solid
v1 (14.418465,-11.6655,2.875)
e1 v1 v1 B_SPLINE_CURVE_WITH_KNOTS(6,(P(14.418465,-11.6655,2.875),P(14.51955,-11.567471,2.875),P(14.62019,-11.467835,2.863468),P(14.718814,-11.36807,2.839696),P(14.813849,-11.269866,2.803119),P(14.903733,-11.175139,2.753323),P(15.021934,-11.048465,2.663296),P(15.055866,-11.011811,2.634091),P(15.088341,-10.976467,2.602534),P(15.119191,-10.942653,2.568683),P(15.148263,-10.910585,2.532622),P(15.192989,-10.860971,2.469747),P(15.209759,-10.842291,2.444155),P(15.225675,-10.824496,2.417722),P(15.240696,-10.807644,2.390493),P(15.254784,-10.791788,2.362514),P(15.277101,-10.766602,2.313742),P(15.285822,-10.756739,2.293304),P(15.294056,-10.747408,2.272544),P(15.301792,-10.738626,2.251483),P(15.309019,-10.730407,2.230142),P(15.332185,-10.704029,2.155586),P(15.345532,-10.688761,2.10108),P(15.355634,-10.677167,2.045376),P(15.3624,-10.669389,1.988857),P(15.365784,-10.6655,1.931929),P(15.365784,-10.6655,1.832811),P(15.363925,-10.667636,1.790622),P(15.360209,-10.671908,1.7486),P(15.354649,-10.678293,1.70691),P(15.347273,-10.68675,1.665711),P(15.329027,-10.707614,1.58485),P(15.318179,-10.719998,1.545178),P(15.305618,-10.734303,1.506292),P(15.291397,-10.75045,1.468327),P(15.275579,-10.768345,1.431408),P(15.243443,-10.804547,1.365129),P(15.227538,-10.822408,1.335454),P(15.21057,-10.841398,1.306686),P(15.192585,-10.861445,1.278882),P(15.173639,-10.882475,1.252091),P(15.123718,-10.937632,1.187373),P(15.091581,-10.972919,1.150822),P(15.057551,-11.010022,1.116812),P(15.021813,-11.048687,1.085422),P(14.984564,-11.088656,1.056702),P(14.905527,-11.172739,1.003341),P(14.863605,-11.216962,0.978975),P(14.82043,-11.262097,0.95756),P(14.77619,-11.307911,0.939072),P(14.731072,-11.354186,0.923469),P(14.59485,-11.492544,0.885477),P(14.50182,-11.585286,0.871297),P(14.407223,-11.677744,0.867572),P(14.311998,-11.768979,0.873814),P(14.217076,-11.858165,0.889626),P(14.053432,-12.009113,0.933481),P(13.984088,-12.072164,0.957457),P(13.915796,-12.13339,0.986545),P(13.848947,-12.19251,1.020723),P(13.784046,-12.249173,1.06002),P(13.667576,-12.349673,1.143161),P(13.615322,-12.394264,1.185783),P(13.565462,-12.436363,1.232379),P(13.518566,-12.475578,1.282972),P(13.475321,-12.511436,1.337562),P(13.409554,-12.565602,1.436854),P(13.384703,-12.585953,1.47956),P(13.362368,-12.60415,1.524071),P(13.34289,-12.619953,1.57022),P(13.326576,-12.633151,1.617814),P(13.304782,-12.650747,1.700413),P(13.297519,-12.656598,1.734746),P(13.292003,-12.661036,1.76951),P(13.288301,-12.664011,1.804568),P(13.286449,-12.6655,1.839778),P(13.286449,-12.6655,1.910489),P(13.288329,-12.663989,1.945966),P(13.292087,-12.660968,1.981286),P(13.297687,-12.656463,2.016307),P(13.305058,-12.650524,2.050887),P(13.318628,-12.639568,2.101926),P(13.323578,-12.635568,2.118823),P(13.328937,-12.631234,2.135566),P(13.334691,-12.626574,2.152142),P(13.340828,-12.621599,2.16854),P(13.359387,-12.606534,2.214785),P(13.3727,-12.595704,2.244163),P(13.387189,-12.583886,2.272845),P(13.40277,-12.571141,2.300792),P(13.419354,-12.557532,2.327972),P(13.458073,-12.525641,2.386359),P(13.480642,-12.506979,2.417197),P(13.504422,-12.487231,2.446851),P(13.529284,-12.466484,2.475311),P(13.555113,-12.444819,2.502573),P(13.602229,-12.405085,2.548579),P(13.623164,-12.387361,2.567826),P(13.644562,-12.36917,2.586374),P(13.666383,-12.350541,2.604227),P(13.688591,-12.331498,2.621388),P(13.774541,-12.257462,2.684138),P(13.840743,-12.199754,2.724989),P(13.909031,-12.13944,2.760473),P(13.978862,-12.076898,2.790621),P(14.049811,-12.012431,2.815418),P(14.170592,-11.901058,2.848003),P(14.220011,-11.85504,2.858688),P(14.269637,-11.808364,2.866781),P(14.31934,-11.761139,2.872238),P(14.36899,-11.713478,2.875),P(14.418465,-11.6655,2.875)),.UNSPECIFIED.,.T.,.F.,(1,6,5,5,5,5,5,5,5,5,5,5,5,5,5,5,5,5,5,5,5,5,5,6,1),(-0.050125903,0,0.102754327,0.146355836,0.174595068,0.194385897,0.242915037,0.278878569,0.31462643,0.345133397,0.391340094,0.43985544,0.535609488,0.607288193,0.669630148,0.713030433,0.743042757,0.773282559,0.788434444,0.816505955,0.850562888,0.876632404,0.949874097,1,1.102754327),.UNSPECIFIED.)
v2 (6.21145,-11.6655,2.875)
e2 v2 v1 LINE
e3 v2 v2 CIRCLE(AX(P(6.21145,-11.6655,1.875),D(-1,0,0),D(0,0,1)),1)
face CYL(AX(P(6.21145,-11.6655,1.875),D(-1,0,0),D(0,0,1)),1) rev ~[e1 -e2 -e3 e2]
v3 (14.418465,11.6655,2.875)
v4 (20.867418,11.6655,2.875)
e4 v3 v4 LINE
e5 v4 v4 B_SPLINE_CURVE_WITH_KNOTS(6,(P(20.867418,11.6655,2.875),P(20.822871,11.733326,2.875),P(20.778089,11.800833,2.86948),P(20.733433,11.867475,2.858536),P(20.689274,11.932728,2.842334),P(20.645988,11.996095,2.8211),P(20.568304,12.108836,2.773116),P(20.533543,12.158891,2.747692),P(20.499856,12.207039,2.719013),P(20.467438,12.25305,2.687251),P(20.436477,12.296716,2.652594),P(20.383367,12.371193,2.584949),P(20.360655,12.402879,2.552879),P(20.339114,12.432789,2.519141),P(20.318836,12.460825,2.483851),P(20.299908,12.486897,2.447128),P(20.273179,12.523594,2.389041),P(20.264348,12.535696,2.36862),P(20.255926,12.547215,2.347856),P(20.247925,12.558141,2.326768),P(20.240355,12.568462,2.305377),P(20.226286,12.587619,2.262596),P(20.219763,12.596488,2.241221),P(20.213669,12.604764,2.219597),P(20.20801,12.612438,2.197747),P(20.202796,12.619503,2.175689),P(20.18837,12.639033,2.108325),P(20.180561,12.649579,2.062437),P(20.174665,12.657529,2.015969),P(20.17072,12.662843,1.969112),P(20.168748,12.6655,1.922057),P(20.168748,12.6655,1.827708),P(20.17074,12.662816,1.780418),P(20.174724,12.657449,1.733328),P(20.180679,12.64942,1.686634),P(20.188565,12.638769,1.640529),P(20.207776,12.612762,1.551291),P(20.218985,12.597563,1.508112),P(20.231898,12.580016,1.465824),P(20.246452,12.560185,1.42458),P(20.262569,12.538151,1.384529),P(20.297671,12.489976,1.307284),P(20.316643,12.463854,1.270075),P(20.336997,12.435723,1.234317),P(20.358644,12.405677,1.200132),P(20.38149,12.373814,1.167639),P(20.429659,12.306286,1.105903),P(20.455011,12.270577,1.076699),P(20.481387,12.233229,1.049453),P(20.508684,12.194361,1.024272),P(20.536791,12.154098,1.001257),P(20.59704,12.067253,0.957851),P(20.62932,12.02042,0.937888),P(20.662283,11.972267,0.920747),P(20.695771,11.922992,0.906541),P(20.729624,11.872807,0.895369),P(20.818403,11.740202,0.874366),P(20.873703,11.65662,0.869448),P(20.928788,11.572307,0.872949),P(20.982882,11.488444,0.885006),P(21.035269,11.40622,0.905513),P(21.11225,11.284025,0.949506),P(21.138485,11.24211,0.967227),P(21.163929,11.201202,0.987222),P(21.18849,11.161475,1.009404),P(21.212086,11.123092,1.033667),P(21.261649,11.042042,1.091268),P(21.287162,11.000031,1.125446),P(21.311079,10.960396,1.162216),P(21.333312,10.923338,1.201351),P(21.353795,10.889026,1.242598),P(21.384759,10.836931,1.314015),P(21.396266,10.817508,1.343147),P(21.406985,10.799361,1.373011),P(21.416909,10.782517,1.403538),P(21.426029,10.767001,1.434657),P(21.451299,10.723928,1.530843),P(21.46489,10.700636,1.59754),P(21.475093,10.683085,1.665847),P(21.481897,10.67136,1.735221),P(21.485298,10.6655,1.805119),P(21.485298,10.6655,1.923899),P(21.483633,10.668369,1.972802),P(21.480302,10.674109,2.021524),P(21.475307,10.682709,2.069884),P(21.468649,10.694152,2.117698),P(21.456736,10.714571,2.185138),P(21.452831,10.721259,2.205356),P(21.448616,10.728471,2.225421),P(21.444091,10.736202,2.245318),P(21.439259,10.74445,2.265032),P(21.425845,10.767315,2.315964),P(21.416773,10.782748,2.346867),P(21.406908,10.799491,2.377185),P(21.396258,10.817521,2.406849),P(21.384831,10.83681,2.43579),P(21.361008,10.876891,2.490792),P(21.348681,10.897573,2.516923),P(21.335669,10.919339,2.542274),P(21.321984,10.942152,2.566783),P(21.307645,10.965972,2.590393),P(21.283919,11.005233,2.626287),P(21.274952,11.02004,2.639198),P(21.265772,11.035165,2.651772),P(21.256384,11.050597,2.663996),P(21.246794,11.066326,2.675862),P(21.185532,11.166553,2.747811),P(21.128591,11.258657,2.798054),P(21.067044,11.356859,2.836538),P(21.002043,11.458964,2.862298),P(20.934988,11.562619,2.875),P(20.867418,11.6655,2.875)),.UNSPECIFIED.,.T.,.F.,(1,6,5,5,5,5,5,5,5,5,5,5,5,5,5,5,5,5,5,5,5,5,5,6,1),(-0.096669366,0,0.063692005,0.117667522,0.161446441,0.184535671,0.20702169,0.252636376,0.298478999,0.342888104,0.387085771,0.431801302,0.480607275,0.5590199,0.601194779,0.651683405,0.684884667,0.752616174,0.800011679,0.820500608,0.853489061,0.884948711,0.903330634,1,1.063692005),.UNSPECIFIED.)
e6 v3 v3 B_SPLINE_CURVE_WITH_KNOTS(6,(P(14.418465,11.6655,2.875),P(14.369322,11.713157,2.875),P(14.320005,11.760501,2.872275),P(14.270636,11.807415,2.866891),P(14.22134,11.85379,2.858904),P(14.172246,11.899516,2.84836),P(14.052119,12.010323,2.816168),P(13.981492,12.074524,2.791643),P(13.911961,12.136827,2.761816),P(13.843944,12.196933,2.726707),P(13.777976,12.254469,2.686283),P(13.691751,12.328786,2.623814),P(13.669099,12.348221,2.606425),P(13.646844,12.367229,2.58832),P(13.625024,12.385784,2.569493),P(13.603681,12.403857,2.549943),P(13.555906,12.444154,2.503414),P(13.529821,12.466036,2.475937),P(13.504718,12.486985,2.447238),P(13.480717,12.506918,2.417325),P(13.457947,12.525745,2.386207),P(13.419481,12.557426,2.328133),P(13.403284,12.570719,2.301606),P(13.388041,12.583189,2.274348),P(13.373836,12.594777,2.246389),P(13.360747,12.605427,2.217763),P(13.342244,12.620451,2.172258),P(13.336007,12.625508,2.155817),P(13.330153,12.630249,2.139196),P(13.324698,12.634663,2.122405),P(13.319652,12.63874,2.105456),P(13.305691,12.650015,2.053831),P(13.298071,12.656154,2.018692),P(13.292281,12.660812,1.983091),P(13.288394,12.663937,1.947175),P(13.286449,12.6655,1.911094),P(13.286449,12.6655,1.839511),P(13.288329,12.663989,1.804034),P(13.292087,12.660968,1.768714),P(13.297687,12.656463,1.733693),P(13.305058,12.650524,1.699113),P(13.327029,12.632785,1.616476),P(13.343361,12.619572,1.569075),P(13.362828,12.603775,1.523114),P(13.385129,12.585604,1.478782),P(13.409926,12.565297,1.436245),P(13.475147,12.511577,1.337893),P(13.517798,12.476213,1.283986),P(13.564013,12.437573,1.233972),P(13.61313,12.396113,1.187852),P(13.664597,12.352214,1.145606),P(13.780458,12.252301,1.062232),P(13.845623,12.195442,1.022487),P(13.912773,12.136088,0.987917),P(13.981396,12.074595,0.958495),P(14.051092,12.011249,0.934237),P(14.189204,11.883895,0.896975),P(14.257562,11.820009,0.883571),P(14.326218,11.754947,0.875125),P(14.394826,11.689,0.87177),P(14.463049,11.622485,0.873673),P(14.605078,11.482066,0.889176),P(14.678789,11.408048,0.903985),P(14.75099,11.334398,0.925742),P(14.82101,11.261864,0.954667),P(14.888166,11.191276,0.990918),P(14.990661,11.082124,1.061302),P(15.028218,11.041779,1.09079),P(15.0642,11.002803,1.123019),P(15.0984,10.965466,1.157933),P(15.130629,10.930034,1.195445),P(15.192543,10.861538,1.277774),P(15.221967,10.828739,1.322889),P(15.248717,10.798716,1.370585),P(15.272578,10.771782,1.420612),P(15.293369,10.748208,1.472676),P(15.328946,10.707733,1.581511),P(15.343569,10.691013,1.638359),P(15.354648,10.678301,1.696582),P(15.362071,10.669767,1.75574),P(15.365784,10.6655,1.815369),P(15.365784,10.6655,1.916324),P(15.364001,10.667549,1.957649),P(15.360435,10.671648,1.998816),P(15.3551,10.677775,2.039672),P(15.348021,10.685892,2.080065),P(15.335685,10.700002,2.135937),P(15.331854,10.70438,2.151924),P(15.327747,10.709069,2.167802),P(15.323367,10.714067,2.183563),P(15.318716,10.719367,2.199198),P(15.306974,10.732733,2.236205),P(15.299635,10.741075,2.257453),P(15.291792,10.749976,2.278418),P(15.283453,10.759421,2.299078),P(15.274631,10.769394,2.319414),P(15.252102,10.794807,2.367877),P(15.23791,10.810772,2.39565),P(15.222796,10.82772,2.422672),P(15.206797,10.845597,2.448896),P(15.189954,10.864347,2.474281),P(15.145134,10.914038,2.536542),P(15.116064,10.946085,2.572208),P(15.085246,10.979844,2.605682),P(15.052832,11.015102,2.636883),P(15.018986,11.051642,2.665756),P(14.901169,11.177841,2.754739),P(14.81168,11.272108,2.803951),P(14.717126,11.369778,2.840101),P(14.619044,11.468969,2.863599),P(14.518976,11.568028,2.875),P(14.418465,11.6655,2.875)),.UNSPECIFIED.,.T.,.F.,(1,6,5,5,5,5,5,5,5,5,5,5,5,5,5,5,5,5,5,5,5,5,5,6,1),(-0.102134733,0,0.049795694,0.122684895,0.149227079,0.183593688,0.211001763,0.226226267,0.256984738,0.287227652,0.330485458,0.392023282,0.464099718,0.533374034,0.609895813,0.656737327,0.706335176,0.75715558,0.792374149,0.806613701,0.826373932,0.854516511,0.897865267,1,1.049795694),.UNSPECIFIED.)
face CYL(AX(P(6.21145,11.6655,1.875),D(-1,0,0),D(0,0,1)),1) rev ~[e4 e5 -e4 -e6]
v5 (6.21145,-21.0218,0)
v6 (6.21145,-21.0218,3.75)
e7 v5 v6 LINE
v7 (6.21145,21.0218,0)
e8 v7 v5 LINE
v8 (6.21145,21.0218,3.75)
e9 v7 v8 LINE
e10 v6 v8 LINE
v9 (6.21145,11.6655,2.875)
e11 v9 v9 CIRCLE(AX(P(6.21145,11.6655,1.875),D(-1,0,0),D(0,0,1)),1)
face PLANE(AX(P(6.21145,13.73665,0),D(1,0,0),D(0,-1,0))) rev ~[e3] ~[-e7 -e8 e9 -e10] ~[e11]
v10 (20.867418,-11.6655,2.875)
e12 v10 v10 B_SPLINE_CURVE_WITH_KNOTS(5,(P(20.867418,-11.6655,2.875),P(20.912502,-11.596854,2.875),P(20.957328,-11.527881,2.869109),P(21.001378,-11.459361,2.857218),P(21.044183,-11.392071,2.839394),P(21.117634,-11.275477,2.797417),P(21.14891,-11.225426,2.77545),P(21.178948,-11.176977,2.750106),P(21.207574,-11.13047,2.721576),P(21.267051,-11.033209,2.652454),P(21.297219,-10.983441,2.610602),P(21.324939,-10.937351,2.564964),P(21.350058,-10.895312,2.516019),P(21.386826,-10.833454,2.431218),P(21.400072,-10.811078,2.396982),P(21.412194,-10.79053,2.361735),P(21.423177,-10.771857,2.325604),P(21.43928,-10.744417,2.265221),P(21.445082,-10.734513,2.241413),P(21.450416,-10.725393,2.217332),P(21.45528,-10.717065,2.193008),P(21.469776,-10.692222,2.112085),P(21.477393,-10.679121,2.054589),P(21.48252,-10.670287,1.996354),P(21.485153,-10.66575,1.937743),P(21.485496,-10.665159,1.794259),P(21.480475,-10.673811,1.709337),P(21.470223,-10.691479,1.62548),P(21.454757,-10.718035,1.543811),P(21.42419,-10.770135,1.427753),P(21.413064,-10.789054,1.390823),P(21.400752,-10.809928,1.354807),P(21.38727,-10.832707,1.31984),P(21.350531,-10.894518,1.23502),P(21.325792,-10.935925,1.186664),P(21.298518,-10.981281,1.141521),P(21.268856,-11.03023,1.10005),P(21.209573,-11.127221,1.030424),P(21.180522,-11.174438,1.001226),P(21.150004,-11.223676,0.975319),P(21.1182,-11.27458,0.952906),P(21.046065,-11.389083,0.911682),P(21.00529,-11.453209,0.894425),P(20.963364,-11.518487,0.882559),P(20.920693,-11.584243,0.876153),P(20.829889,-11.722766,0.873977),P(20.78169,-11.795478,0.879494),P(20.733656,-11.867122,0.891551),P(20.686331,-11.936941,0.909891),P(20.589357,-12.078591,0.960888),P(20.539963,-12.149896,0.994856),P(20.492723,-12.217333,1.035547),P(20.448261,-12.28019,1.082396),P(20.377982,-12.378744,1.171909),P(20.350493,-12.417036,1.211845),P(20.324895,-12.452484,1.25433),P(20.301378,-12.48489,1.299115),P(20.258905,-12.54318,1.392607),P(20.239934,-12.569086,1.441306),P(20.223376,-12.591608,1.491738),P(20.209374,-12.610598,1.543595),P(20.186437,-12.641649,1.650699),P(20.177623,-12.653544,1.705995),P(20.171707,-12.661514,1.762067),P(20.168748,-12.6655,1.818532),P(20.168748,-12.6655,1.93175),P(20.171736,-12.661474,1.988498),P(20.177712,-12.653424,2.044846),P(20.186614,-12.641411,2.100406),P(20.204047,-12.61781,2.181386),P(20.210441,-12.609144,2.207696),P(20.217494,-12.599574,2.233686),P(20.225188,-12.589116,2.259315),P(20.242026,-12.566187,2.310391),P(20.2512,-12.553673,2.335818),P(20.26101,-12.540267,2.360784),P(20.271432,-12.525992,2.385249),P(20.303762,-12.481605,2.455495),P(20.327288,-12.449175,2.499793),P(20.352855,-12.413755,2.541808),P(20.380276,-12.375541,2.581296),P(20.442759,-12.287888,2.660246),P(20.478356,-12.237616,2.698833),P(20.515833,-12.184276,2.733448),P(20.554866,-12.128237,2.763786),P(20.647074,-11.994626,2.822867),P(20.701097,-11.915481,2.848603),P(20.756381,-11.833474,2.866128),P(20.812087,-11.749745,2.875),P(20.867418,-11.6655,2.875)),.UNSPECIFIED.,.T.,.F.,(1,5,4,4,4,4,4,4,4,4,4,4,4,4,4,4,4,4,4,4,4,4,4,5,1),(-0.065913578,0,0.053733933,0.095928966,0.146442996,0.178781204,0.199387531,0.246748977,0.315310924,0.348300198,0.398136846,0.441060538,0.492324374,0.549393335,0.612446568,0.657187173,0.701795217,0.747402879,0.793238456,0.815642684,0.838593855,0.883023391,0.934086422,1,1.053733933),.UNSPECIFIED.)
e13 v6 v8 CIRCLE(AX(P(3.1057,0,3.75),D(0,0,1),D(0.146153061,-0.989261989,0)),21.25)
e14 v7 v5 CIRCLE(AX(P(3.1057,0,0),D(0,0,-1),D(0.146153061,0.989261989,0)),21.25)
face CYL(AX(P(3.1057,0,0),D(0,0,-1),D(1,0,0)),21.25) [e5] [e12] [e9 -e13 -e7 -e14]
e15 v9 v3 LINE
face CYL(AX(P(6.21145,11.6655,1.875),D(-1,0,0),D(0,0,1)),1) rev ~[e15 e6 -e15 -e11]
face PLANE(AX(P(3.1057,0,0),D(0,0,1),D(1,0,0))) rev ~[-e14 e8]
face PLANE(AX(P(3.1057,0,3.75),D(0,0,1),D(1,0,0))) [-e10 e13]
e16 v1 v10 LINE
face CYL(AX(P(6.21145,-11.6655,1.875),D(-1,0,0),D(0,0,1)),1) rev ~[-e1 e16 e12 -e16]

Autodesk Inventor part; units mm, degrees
ref_plane "YZ Plane" through (0, 0, 0) normal (1, 0, 0) x (0, 1, 0)
ref_plane "XZ Plane" through (0, 0, 0) normal (0, 1, 0) x (-1, 0, 0)
ref_plane "XY Plane" through (0, 0, 0) normal (0, 0, 1) x (1, 0, 0)
sketch "Sketch3" plane through (0, 0, 0) normal (0, 0, 1) x (1, 0, 0)
  arc A0 (6.2115, -31.9009) -> (6.2115, 31.9009) centre (0, 0) ccw
  line L0 (6.2115, 27.4733) -> (6.2115, 31.9009)
  line L1 (6.2115, 31.9009) -> (6.2115, -31.9009)
  circle A1 centre (0, 0) radius 42.5
  line L2 (6.2115, -31.9009) -> (6.2115, -42.0436)
  line L3 (6.2115, 31.9009) -> (6.2115, 42.0436)
  point P0 (-5.2115, 24.6247)
  dimension "d14" = 85
extrude "Extrusion2" add sketch "Sketch3" along normal blind 7.5 contours L1 L0 A0
sketch "Sketch4" plane through (6.2115, -31.9009, 0) normal (-1, 0, 0) x (0, 0, 1)
  line L0 (0, 0) -> (0, 6.9167)
  line L1 (7.5, 26.7893) -> (7.5, 0)
  line L2 (7.5, 6.9167) -> (7.5, 0)
  line L3 (7.5, 0) -> (0, 0)
  line L4 (7.5, 0) -> (0, 0)
  circle A0 centre (3.75, 8.5699) radius 1
  line L5 (0, 0) -> (3.0149, 2.7804)
  line L6 (4.4851, 4.1363) -> (7.5, 6.9167)
  line L7 (0, 6.9167) -> (3.0149, 4.1363)
  line L8 (4.4851, 2.7804) -> (7.5, 0)
  line L9 (0, 0) -> (0, 53.5786)
  line L10 (0, 53.5786) -> (0, 0)
  line L11 (0, 31.9009) -> (7.5, 31.9009)
  circle A1 centre (3.75, 55.2319) radius 1
  line L12 (7.5, 53.5786) -> (7.5, 0)
  line L13 (0, 0) -> (0, 63.8018) projected
  line L14 (0, 63.8018) -> (0, 0)
  line L15 (0, 31.9009) -> (3.75, 31.9009)
  circle A2 centre (3.75, 8.5699) radius 2
  circle A3 centre (3.75, 55.2319) radius 2
  point P0 (280.32, 51.414)
  dimension "d7" = 2
  dimension "d10" = 4
  dimension "d11" = 4
extrude "Extrusion3" cut sketch "Sketch4" against normal blind 25.4 contours A0 | A1
extrude "Extrusion4" cut sketch "Sketch4" against normal blind 32.8625 contours A2 | A3
extrude "Extrusion5" add sketch "Sketch3" along normal blind 7.5 contours A0 L3 A1 L2
extrude "Extrusion6" cut sketch "Sketch4" against normal blind 50.3625 contours A0 | A1 | A2 | A3
scale "Scale1" factors (0.5, 0.5, 0.5) then translate (3.1057, 0, 0) bodies 1
properties part number "ContrapesoGrande"
